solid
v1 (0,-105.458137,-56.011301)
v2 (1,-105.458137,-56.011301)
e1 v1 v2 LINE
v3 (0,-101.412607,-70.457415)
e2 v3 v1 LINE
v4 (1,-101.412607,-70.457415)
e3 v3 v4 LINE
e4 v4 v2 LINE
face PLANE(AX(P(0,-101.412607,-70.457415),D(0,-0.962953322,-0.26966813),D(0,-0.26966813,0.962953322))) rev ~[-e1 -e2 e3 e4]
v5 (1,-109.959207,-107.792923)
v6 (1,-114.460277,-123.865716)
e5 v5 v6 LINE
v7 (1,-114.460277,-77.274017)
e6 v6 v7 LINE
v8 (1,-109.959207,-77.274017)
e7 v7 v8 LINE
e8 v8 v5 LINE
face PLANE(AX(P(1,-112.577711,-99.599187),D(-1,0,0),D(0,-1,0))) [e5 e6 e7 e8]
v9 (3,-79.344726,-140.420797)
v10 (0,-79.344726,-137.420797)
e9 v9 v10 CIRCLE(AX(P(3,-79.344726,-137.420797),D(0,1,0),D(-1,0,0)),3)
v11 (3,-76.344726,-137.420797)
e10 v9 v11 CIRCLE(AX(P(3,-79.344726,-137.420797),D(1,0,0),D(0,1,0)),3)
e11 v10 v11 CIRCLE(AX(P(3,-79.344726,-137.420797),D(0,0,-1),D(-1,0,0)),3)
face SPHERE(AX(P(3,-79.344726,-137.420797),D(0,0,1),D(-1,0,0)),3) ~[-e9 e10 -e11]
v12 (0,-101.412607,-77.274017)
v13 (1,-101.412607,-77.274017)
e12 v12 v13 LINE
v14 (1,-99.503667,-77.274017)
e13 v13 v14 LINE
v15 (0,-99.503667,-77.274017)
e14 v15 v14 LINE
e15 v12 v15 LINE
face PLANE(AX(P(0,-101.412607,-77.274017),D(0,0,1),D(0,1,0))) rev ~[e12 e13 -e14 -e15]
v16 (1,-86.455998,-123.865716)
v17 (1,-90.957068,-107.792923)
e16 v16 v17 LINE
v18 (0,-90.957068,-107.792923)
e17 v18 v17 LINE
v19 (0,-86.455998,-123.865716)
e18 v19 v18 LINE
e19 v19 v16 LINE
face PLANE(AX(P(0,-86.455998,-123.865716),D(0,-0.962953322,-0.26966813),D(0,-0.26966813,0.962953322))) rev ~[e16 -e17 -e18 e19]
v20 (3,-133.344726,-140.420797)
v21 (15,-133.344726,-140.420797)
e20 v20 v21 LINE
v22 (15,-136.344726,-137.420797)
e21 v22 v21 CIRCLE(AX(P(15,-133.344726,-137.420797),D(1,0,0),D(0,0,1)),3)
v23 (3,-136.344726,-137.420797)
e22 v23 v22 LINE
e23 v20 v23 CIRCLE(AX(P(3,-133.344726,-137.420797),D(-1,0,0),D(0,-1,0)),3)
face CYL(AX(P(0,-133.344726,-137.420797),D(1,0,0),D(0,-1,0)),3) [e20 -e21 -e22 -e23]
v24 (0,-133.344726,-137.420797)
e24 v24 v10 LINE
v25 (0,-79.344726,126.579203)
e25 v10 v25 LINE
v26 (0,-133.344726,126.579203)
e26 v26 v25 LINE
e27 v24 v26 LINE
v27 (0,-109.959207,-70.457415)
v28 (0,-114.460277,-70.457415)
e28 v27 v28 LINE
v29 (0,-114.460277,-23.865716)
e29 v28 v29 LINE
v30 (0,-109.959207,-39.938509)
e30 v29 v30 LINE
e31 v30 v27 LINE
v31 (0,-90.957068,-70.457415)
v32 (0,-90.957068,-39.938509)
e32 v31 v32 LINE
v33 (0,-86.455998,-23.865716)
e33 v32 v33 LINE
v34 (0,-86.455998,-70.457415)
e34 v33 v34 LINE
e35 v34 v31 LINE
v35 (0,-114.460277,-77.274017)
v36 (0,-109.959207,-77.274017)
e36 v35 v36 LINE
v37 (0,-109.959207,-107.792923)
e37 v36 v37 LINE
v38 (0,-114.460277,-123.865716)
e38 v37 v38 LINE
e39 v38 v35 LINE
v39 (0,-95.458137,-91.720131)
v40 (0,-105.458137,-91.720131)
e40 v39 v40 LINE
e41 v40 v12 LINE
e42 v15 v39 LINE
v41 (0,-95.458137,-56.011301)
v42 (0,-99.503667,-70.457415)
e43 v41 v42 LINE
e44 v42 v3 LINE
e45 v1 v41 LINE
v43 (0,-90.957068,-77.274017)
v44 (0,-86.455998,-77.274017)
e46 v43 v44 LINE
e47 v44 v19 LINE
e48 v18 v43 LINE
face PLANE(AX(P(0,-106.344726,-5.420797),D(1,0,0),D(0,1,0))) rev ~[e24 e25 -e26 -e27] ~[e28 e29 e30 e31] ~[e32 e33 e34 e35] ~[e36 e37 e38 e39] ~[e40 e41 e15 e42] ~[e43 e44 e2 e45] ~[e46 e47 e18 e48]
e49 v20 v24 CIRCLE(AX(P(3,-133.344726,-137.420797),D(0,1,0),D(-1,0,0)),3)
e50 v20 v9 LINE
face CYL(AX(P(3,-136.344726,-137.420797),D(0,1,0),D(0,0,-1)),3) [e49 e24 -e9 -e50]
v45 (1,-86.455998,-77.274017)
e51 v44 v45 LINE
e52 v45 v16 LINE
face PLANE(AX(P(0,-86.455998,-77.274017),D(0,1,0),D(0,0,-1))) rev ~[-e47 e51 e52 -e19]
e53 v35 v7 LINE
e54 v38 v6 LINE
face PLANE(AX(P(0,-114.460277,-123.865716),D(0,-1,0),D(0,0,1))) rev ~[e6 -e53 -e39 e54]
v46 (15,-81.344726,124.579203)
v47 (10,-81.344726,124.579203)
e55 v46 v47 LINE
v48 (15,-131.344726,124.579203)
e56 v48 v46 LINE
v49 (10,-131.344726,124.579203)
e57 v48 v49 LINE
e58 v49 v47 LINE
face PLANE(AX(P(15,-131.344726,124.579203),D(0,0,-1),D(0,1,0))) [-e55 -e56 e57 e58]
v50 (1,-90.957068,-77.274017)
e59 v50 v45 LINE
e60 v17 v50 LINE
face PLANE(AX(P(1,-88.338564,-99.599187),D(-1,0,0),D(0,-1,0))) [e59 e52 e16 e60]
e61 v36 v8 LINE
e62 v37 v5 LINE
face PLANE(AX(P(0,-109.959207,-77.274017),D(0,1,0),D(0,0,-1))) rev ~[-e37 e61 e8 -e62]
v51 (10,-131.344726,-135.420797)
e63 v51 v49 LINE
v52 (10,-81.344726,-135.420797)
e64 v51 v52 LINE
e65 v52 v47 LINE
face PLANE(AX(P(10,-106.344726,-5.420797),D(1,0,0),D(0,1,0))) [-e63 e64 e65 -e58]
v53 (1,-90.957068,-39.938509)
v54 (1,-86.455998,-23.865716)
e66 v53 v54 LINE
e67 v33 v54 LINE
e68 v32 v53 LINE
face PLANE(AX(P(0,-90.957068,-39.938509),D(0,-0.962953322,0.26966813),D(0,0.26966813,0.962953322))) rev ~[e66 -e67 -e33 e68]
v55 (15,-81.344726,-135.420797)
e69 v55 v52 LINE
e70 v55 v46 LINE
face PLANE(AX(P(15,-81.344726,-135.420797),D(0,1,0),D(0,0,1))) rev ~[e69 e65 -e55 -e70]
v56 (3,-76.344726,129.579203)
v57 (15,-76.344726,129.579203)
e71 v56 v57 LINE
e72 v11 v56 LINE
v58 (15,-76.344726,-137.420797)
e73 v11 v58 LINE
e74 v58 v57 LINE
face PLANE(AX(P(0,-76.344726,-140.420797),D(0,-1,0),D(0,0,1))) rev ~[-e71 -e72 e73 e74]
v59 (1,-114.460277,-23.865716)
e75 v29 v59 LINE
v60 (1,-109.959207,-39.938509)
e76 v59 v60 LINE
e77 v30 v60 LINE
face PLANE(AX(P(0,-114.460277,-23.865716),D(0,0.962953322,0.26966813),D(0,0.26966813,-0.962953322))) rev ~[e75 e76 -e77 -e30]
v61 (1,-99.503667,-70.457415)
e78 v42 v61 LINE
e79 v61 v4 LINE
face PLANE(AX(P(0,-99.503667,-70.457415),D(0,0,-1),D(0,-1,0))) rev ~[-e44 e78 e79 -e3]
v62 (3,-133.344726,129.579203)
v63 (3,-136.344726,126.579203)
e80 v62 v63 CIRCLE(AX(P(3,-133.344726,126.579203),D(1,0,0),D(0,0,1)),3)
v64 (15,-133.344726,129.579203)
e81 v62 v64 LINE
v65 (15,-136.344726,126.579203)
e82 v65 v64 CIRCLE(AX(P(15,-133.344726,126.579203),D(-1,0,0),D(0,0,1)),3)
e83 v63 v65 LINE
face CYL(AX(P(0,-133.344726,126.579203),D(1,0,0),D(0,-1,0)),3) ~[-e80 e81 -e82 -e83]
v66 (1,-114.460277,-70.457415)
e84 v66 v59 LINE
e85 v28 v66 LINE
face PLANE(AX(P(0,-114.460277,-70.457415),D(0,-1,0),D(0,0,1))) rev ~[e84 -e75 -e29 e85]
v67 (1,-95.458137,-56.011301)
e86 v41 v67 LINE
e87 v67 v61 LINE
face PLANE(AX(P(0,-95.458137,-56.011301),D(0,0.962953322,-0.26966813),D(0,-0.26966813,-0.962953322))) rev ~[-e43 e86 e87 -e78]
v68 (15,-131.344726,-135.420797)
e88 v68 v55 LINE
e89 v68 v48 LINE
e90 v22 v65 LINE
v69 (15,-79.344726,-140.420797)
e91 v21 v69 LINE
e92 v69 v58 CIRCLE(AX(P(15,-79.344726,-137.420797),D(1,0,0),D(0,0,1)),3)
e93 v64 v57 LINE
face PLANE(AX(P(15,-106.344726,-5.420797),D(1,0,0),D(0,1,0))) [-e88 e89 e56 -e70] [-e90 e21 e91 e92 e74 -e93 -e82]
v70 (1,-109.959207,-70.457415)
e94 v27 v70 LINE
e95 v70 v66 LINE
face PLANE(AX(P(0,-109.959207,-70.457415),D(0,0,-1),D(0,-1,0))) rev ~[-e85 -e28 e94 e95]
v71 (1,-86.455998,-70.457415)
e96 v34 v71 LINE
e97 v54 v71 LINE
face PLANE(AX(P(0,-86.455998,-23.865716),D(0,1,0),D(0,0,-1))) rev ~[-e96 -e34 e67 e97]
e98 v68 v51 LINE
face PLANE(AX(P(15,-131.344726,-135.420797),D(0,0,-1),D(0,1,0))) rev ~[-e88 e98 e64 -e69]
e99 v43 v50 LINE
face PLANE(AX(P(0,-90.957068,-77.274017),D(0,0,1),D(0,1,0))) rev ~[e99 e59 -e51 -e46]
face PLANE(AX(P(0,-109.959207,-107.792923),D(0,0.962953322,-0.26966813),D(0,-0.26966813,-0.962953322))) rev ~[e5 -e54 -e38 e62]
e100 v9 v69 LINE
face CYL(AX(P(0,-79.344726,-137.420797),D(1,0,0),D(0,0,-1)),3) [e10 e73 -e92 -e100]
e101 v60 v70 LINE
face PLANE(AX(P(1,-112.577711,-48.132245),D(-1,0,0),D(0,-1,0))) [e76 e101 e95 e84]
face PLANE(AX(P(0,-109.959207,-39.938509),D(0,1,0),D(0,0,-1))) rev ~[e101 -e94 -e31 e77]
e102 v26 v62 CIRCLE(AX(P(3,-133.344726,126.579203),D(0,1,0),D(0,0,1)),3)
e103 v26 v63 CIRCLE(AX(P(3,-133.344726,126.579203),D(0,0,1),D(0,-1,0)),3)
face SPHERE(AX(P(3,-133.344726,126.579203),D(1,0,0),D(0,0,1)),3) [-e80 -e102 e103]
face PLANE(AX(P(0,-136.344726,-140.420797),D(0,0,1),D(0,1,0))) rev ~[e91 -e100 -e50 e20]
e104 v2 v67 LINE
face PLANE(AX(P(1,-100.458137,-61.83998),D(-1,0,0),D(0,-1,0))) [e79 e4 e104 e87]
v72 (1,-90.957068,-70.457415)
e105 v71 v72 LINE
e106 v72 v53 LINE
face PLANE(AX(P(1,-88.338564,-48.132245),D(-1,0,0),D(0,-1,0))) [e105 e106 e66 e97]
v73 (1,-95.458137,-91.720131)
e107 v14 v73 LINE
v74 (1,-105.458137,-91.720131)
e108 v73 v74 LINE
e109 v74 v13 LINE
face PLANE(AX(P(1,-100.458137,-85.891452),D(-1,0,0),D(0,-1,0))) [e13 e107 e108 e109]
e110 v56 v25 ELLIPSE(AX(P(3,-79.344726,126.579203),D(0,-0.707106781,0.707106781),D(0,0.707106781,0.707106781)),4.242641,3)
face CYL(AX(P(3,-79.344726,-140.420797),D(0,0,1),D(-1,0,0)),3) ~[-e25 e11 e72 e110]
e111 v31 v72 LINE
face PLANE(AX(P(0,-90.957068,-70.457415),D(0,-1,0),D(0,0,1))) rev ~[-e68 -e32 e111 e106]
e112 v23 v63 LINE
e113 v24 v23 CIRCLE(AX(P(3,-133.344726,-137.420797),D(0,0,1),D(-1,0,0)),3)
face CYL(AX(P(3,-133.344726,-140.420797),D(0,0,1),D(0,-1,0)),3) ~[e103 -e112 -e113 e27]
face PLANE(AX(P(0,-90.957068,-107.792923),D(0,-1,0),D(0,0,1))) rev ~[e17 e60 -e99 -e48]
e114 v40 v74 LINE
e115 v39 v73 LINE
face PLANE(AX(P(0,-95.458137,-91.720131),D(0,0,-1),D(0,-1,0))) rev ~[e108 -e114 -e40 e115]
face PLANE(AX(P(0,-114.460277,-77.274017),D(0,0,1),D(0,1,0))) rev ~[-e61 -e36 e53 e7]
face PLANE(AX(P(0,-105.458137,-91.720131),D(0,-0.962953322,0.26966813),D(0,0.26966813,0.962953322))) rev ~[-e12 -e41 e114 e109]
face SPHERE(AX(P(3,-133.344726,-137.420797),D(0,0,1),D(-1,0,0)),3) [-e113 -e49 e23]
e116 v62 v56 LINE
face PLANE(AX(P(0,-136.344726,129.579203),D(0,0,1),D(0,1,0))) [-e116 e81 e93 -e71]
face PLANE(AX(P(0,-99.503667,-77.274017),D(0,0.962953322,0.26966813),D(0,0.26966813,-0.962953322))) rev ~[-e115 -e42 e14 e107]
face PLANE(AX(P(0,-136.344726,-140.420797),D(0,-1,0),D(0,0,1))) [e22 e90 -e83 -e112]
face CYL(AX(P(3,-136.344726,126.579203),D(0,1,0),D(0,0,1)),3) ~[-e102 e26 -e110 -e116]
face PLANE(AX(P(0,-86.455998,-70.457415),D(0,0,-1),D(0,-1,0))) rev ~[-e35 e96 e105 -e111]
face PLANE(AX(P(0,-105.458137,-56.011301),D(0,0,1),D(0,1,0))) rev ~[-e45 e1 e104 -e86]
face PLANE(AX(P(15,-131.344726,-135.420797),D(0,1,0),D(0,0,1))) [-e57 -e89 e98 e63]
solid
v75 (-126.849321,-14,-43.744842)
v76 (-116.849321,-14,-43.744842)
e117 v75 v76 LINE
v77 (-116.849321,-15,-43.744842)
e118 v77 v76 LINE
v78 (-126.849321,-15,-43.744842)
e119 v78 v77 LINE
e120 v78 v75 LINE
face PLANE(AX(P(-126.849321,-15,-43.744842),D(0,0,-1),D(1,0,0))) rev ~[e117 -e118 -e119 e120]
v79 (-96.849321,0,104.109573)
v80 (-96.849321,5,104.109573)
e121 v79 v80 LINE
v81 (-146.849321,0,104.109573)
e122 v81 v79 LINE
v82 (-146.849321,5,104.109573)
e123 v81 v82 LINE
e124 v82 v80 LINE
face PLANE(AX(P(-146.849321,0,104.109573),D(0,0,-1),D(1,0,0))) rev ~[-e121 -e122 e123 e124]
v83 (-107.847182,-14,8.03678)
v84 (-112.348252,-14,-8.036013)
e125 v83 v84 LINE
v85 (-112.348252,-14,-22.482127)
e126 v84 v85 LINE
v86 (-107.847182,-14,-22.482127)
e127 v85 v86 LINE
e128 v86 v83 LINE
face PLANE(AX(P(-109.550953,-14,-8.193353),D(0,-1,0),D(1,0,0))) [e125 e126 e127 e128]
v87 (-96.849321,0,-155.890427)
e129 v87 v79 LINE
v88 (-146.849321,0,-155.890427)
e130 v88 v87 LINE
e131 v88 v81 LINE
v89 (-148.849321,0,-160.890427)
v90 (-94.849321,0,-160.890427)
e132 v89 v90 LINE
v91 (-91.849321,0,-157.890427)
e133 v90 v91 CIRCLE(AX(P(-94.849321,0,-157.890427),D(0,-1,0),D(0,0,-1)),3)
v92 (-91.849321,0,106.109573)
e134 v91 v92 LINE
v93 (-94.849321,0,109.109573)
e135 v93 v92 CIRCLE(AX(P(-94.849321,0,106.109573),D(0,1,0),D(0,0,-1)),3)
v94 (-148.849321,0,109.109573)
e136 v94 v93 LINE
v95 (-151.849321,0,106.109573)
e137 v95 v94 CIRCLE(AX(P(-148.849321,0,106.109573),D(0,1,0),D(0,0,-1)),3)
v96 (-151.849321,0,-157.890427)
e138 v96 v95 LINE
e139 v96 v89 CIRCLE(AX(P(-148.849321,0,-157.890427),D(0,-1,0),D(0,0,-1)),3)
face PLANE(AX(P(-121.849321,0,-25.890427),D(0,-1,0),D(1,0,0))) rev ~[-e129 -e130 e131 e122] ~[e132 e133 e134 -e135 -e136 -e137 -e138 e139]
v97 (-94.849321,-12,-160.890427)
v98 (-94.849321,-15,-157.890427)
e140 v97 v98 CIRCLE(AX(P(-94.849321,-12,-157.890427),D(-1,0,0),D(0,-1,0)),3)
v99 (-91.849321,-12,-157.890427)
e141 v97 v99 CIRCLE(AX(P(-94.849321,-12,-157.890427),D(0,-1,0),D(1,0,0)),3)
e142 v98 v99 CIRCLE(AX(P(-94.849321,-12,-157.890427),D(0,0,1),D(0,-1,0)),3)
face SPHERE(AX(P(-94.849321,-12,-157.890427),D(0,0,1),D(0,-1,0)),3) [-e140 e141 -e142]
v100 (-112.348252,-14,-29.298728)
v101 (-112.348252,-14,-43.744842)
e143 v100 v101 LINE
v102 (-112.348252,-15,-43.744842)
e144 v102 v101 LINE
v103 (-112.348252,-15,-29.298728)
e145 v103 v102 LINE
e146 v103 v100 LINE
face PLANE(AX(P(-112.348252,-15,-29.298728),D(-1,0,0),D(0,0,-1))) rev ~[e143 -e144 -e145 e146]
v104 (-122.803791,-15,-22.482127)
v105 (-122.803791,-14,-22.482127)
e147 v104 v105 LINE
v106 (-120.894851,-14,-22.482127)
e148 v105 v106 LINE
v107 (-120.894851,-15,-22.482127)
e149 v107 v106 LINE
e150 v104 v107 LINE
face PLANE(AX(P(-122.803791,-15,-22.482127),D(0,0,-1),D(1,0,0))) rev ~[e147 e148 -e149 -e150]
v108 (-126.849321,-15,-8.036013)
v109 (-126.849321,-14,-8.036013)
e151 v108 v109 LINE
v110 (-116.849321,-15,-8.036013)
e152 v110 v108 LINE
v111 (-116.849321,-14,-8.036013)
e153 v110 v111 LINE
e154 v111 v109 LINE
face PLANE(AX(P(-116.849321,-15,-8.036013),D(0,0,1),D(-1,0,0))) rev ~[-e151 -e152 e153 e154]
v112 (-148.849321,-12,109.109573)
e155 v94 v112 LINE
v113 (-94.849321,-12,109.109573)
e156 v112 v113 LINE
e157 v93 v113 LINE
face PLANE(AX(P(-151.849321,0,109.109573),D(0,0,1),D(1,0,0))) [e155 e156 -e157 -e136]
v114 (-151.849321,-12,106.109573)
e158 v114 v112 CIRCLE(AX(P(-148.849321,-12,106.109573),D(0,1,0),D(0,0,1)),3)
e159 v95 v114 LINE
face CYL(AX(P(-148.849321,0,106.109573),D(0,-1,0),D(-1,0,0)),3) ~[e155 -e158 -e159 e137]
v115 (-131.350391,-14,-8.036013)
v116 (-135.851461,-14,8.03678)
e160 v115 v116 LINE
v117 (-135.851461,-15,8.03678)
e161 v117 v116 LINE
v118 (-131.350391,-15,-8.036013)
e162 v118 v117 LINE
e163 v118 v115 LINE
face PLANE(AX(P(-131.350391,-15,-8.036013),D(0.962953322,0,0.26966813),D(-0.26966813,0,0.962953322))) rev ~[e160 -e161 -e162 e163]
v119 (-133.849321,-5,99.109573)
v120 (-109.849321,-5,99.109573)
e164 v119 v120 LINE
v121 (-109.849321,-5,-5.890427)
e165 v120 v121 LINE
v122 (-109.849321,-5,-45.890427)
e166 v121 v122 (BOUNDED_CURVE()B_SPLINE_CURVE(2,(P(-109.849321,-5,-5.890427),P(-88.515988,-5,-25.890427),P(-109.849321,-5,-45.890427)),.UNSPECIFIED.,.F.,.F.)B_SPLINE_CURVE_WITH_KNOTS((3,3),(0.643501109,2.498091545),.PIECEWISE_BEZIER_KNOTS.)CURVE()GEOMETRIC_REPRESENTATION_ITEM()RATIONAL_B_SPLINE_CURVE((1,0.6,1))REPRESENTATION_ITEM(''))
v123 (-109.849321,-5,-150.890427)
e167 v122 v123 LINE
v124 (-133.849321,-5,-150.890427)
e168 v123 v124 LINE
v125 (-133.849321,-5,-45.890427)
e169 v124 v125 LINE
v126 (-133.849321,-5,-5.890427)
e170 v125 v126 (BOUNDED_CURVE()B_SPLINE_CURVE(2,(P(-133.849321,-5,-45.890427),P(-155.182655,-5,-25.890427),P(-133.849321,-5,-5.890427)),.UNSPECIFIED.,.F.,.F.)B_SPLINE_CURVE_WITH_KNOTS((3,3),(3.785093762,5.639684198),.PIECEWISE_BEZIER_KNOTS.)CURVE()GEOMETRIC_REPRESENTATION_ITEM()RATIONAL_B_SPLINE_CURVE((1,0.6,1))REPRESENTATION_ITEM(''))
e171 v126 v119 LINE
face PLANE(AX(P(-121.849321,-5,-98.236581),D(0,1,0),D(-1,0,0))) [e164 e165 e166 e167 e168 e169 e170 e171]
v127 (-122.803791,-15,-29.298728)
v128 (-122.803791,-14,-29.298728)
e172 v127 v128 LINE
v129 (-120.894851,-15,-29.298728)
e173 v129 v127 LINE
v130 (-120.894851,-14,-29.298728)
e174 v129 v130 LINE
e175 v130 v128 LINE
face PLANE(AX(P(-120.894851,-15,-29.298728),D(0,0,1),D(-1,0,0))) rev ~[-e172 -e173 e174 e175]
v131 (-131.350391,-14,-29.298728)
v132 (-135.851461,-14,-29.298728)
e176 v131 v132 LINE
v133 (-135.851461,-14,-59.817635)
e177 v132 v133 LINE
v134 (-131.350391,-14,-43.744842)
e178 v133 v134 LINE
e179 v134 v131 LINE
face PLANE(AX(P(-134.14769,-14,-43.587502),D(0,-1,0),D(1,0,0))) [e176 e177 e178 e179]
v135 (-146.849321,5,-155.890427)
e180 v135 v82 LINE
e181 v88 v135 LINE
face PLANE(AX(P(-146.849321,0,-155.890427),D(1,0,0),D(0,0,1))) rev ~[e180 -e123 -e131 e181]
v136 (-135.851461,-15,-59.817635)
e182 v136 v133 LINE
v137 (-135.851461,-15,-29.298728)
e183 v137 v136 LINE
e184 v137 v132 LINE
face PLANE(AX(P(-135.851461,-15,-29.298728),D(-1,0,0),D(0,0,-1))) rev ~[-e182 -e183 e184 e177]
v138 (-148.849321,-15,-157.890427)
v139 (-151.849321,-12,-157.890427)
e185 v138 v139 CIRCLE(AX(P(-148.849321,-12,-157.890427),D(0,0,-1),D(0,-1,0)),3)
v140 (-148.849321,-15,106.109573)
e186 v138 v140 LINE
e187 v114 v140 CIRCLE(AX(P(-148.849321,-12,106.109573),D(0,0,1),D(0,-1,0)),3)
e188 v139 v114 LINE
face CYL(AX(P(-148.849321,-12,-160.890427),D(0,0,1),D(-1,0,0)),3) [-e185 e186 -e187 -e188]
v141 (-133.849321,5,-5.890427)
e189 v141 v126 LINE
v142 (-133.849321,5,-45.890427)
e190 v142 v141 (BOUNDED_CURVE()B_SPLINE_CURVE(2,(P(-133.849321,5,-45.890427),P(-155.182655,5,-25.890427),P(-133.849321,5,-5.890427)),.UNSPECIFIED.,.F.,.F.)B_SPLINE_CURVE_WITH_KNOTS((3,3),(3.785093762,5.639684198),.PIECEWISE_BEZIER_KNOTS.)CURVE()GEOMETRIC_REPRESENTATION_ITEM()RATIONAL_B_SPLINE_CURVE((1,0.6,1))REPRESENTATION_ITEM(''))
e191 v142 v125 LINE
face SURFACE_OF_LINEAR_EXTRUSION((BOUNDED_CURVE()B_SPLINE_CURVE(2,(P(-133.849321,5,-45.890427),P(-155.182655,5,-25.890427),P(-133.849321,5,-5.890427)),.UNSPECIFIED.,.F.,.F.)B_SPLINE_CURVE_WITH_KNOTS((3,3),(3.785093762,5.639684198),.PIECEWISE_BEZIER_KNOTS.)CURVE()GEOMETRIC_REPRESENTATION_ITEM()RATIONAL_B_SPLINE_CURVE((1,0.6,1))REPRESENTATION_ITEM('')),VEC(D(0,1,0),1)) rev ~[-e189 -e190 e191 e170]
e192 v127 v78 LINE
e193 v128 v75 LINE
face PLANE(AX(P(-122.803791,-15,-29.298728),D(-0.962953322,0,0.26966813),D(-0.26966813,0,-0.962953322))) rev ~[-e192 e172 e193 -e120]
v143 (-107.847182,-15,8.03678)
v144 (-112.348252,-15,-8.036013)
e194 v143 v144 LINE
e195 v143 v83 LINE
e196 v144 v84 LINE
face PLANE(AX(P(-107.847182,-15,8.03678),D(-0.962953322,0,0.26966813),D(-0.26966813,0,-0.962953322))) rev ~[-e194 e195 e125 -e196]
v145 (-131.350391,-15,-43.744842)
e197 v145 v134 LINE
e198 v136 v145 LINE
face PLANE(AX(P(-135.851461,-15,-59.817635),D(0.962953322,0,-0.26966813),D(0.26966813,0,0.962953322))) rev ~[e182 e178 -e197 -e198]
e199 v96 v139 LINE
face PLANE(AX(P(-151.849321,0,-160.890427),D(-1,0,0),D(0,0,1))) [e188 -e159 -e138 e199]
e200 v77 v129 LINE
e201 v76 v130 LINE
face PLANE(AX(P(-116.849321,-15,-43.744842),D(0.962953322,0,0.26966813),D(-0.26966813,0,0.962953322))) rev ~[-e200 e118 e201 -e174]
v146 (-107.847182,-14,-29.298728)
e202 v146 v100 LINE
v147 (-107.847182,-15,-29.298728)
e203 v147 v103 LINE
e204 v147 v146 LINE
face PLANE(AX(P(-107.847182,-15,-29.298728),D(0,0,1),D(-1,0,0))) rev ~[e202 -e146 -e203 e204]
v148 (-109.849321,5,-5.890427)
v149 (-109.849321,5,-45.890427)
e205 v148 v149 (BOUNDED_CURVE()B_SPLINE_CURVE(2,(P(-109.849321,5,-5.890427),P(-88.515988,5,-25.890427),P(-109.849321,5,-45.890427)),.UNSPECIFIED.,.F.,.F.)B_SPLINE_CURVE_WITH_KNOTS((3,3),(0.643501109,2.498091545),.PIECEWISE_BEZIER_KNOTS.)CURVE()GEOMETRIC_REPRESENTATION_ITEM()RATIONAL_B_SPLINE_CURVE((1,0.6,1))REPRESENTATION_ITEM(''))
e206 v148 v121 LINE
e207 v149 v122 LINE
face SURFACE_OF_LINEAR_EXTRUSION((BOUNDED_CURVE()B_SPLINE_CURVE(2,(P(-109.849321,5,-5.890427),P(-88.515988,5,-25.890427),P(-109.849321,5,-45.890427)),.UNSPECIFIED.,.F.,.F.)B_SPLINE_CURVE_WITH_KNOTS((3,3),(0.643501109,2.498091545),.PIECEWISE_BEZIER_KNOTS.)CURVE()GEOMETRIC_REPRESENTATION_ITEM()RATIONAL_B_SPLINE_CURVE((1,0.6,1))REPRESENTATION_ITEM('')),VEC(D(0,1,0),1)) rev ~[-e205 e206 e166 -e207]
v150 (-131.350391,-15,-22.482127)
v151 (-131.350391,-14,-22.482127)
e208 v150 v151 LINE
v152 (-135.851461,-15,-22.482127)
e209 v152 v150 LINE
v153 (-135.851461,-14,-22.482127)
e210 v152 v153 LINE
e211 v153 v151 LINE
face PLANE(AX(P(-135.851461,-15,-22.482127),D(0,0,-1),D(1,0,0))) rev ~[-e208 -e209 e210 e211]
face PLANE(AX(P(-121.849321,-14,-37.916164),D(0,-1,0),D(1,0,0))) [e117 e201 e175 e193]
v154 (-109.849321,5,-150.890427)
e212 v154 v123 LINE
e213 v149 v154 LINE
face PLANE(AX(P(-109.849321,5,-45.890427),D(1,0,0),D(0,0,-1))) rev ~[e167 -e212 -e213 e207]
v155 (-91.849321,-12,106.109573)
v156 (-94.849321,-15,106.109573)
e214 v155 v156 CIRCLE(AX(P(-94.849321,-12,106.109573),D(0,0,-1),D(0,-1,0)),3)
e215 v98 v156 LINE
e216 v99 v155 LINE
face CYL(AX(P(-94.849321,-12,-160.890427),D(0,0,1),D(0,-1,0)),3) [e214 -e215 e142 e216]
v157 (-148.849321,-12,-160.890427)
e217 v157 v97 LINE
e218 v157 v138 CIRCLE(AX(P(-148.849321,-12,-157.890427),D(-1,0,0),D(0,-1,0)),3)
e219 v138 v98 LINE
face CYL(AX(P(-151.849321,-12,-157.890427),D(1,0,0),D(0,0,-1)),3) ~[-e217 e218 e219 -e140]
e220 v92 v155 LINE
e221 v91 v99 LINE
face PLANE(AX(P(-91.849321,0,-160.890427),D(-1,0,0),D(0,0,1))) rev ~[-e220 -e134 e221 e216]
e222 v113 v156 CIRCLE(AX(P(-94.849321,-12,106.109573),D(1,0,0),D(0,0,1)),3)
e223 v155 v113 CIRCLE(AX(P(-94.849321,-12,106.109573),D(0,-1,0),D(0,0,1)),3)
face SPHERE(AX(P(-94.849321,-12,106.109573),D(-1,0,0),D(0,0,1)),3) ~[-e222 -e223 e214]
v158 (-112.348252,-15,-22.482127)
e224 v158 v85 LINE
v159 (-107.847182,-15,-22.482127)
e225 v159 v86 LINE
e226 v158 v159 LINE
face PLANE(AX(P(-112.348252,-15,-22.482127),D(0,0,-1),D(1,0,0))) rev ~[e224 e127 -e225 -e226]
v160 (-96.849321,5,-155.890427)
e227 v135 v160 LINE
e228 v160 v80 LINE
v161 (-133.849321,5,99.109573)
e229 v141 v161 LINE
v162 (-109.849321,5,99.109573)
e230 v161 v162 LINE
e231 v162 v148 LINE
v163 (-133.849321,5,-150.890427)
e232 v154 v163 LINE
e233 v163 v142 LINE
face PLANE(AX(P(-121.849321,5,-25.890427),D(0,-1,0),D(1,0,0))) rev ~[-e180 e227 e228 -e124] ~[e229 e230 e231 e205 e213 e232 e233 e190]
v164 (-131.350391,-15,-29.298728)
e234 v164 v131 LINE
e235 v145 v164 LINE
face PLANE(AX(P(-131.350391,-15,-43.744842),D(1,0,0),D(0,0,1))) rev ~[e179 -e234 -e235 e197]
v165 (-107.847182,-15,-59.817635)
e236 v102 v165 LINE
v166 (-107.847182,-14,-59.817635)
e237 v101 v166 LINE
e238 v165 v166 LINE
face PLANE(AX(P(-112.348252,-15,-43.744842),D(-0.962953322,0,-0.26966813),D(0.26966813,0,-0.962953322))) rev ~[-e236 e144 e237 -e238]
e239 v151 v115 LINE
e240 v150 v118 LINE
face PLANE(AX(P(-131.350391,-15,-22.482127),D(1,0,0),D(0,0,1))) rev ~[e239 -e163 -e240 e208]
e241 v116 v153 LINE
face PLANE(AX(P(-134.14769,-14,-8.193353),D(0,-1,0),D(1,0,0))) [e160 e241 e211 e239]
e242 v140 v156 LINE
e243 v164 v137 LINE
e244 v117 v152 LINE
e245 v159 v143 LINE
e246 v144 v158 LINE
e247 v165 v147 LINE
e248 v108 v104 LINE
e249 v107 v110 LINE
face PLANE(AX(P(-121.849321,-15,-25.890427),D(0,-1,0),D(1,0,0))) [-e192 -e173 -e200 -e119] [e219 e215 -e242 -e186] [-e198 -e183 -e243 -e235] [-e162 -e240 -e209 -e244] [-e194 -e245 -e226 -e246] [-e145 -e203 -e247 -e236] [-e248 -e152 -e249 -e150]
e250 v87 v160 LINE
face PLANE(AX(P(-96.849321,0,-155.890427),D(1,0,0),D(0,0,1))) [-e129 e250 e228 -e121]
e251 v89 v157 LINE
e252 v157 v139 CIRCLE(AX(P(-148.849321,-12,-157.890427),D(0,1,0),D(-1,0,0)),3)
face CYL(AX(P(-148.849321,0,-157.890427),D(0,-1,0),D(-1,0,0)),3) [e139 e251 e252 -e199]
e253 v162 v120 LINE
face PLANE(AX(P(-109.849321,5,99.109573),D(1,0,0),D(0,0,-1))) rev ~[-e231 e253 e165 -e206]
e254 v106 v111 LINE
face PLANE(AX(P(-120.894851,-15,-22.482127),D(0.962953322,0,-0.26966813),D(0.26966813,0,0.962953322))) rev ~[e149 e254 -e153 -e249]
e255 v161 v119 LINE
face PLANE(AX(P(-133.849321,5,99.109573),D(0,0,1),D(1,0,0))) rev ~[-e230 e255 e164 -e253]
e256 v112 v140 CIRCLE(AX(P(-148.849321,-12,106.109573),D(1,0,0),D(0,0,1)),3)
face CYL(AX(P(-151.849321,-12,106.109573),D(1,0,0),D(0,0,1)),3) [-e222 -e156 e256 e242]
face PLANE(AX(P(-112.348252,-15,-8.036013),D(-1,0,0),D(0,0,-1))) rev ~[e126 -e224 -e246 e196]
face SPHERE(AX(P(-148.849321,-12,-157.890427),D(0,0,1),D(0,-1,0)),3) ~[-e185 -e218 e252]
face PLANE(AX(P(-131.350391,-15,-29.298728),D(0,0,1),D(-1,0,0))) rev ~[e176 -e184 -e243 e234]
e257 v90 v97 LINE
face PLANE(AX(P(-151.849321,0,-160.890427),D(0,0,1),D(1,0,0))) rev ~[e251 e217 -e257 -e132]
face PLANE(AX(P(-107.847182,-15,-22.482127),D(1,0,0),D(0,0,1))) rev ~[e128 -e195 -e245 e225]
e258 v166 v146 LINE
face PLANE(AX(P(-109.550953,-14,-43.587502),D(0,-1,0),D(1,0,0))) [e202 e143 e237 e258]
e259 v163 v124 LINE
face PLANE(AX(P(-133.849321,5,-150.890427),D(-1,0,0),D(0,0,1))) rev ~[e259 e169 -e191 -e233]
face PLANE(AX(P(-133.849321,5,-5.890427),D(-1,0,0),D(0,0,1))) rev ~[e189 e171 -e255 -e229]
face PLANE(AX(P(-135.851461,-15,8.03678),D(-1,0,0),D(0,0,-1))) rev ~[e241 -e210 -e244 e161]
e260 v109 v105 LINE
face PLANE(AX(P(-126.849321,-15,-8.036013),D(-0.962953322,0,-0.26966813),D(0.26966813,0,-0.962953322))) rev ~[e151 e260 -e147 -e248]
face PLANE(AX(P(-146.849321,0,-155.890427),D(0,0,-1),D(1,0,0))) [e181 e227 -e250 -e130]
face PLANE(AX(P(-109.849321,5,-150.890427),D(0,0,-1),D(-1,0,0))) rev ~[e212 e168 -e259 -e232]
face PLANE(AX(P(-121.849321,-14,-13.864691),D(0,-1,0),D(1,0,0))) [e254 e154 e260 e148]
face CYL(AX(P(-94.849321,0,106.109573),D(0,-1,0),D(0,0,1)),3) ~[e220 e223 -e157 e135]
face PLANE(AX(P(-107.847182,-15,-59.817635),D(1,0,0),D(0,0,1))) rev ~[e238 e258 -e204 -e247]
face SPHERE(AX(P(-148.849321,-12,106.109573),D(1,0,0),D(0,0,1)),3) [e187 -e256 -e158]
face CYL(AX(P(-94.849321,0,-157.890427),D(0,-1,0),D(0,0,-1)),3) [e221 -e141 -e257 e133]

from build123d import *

# Parameters (mm, degrees)
F0_W      = 60
F0_H      = 270
F2_DEPTH  = 15
F3_W      = 50
F3_H      = 260
F4_DEPTH  = 5
F1_W      = 60
F1_H      = 270
F5_DEPTH  = 15
F6_W      = 50
F6_H      = 260
F7_DEPTH  = 5
F9_DEPTH  = 10
F10_R     = 3
F11_R     = 3
F13_DEPTH = 1
F15_DEPTH = 1


# Not quite as in the source:
# - a feature names something its author has since deleted; it is built from what else it names


with BuildPart() as f2:
    # F0 (on Front) → F2 (new body)
    with BuildSketch(Plane.XZ):
        with Locations((-121.8493213905, -25.8904273567)):
            Rectangle(F0_W, F0_H)
    extrude(amount=F2_DEPTH)

    # F3 (on face) → F4 (join)
    with BuildSketch(Plane.XZ):
        with Locations((-121.8493213905, -25.8904273567)):
            Rectangle(F3_W, F3_H)
    extrude(amount=-F4_DEPTH)

    # F8 (on face) → F9 (cut)
    with BuildSketch(Plane(origin=(0, 5, 0), x_dir=(-1, 0, 0), z_dir=(0, 1, 0))):
        with BuildLine():
            Line((109.8493213905, -150.8904273567), (133.8493213905, -150.8904273567))
            Line((133.8493213905, -150.8904273567), (133.8493213905, -45.8904273567))
            add(Edge.make_bspline(
                [(109.8493213905, -45.8904273567), (121.8493213905, -57.1404273567), (133.8493213905, -45.8904273567)],
                knots=[2.4980915448, 2.4980915448, 2.4980915448, 3.7850937624, 3.7850937624, 3.7850937624], degree=2, weights=[1, 0.8, 1]))
            Line((109.8493213905, -45.8904273567), (109.8493213905, -150.8904273567))
        make_face()
        with BuildLine():
            add(Edge.make_bspline(
                [(133.8493213905, -5.8904273567), (128.5159880572, -0.8904273567), (121.8493213905, -0.8904273567)],
                knots=[5.6396841984, 5.6396841984, 5.6396841984, 6.2831853072, 6.2831853072, 6.2831853072], degree=2, weights=[1, 0.9486832981, 1]))
            Line((133.8493213905, -5.8904273567), (133.8493213905, 99.1095726433))
            Line((133.8493213905, 99.1095726433), (109.8493213905, 99.1095726433))
            Line((109.8493213905, 99.1095726433), (109.8493213905, -5.8904273567))
            add(Edge.make_bspline(
                [(121.8493213905, -0.8904273567), (115.1826547239, -0.8904273567), (109.8493213905, -5.8904273567)],
                knots=[0, 0, 0, 0.6435011088, 0.6435011088, 0.6435011088], degree=2, weights=[1, 0.9486832981, 1]))
        make_face()
        with BuildLine():
            Line((133.8493213905, -5.8904273567), (133.8493213905, -45.8904273567))
            add(Edge.make_bspline(
                [(133.8493213905, -45.8904273567), (155.1826547239, -25.8904273567), (133.8493213905, -5.8904273567)],
                knots=[3.7850937624, 3.7850937624, 3.7850937624, 5.6396841984, 5.6396841984, 5.6396841984], degree=2, weights=[1, 0.6, 1]))
        make_face()
        with BuildLine():
            add(Edge.make_bspline(
                [(109.8493213905, -45.8904273567), (121.8493213905, -57.1404273567), (133.8493213905, -45.8904273567)],
                knots=[2.4980915448, 2.4980915448, 2.4980915448, 3.7850937624, 3.7850937624, 3.7850937624], degree=2, weights=[1, 0.8, 1]))
            Line((133.8493213905, -45.8904273567), (133.8493213905, -5.8904273567))
            add(Edge.make_bspline(
                [(133.8493213905, -5.8904273567), (128.5159880572, -0.8904273567), (121.8493213905, -0.8904273567)],
                knots=[5.6396841984, 5.6396841984, 5.6396841984, 6.2831853072, 6.2831853072, 6.2831853072], degree=2, weights=[1, 0.9486832981, 1]))
            add(Edge.make_bspline(
                [(121.8493213905, -0.8904273567), (115.1826547239, -0.8904273567), (109.8493213905, -5.8904273567)],
                knots=[0, 0, 0, 0.6435011088, 0.6435011088, 0.6435011088], degree=2, weights=[1, 0.9486832981, 1]))
            Line((109.8493213905, -5.8904273567), (109.8493213905, -45.8904273567))
        make_face()
        with BuildLine():
            add(Edge.make_bspline(
                [(109.8493213905, -5.8904273567), (88.5159880572, -25.8904273567), (109.8493213905, -45.8904273567)],
                knots=[0.6435011088, 0.6435011088, 0.6435011088, 2.4980915448, 2.4980915448, 2.4980915448], degree=2, weights=[1, 0.6, 1]))
            Line((109.8493213905, -45.8904273567), (109.8493213905, -5.8904273567))
        make_face()
    extrude(amount=-F9_DEPTH, mode=Mode.SUBTRACT)

    # F10
    f10_edges = [f2.edges().sort_by_distance(p)[0] for p in [
        (-121.849321, -15, 109.109573),
        (-151.849321, -7.5, 109.109573),
        (-91.849321, -7.5, 109.109573),
        (-91.849321, -15, -25.890427),
        (-151.849321, -15, -25.890427),
        (-121.849321, -15, -160.890427),
        (-151.849321, -7.5, -160.890427),
        (-91.849321, -7.5, -160.890427),
    ]]
    fillet(f10_edges, radius=F10_R)

    # F14 (on face) → F15 (cut)
    with BuildSketch(Plane.XZ.offset(15)):
        Polygon((-135.8514606564, -59.817634666), (-131.3503910235, -43.7448419752), (-131.3503910235, -29.2987280125), (-135.8514606564, -29.2987280125), align=None)
        Polygon((-122.8037913994, -29.2987280125), (-126.8493213905, -43.7448419752), (-116.8493213905, -43.7448419752), (-120.8948513817, -29.2987280125), align=None)
        Polygon((-112.3482517576, -29.2987280125), (-112.3482517576, -43.7448419752), (-107.8471821246, -59.817634666), (-107.8471821246, -29.2987280125), align=None)
        Polygon((-107.8471821246, 8.0367799526), (-112.3482517576, -8.0360127381), (-112.3482517576, -22.4821267008), (-107.8471821246, -22.4821267008), align=None)
        Polygon((-116.8493213905, -8.0360127381), (-126.8493213905, -8.0360127381), (-122.8037913994, -22.4821267008), (-120.8948513817, -22.4821267008), align=None)
        Polygon((-131.3503910235, -22.4821267008), (-131.3503910235, -8.0360127381), (-135.8514606564, 8.0367799526), (-135.8514606564, -22.4821267008), align=None)
    extrude(amount=-F15_DEPTH, mode=Mode.SUBTRACT)


with BuildPart() as f5:
    # F1 (on Right) → F5 (new body)
    with BuildSketch(Plane.YZ):
        with Locations((-106.3447256267, -5.4207965732)):
            Rectangle(F1_W, F1_H)
    extrude(amount=F5_DEPTH)

    # F6 (on face) → F7 (cut)
    with BuildSketch(Plane.YZ.offset(15)):
        with Locations((-106.3447256267, -5.4207965732)):
            Rectangle(F6_W, F6_H)
    extrude(amount=-F7_DEPTH, mode=Mode.SUBTRACT)

    # F11
    f11_edges = [f5.edges().sort_by_distance(p)[0] for p in [
        (7.5, -136.344726, 129.579203),
        (0, -106.344726, 129.579203),
        (0, -136.344726, -5.420797),
        (0, -76.344726, -5.420797),
        (0, -106.344726, -140.420797),
        (7.5, -76.344726, -140.420797),
        (7.5, -136.344726, -140.420797),
    ]]
    fillet(f11_edges, radius=F11_R)

    # F12 (on face) → F13 (cut)
    with BuildSketch(Plane(origin=(0, 0, 0), x_dir=(0, -1, 0), z_dir=(-1, 0, 0))):
        Polygon((105.4581373974, -56.0113014256), (95.4581373974, -56.0113014256), (99.5036673885, -70.4574153882), (101.4126074063, -70.4574153882), align=None)
        Polygon((90.9570677645, -70.4574153882), (90.9570677645, -39.9385087348), (86.4559981315, -23.8657160441), (86.4559981315, -70.4574153882), align=None)
        Polygon((114.4602766633, -23.8657160441), (109.9592070304, -39.9385087348), (109.9592070304, -70.4574153882), (114.4602766633, -70.4574153882), align=None)
        Polygon((109.9592070304, -77.2740167), (109.9592070304, -107.7929233534), (114.4602766633, -123.8657160441), (114.4602766633, -77.2740167), align=None)
        Polygon((99.5036673885, -77.2740167), (95.4581373974, -91.7201306627), (105.4581373974, -91.7201306627), (101.4126074063, -77.2740167), align=None)
        Polygon((86.4559981315, -123.8657160441), (90.9570677645, -107.7929233534), (90.9570677645, -77.2740167), (86.4559981315, -77.2740167), align=None)
    extrude(amount=-F13_DEPTH, mode=Mode.SUBTRACT)


solid = Compound([f2.part, f5.part])
